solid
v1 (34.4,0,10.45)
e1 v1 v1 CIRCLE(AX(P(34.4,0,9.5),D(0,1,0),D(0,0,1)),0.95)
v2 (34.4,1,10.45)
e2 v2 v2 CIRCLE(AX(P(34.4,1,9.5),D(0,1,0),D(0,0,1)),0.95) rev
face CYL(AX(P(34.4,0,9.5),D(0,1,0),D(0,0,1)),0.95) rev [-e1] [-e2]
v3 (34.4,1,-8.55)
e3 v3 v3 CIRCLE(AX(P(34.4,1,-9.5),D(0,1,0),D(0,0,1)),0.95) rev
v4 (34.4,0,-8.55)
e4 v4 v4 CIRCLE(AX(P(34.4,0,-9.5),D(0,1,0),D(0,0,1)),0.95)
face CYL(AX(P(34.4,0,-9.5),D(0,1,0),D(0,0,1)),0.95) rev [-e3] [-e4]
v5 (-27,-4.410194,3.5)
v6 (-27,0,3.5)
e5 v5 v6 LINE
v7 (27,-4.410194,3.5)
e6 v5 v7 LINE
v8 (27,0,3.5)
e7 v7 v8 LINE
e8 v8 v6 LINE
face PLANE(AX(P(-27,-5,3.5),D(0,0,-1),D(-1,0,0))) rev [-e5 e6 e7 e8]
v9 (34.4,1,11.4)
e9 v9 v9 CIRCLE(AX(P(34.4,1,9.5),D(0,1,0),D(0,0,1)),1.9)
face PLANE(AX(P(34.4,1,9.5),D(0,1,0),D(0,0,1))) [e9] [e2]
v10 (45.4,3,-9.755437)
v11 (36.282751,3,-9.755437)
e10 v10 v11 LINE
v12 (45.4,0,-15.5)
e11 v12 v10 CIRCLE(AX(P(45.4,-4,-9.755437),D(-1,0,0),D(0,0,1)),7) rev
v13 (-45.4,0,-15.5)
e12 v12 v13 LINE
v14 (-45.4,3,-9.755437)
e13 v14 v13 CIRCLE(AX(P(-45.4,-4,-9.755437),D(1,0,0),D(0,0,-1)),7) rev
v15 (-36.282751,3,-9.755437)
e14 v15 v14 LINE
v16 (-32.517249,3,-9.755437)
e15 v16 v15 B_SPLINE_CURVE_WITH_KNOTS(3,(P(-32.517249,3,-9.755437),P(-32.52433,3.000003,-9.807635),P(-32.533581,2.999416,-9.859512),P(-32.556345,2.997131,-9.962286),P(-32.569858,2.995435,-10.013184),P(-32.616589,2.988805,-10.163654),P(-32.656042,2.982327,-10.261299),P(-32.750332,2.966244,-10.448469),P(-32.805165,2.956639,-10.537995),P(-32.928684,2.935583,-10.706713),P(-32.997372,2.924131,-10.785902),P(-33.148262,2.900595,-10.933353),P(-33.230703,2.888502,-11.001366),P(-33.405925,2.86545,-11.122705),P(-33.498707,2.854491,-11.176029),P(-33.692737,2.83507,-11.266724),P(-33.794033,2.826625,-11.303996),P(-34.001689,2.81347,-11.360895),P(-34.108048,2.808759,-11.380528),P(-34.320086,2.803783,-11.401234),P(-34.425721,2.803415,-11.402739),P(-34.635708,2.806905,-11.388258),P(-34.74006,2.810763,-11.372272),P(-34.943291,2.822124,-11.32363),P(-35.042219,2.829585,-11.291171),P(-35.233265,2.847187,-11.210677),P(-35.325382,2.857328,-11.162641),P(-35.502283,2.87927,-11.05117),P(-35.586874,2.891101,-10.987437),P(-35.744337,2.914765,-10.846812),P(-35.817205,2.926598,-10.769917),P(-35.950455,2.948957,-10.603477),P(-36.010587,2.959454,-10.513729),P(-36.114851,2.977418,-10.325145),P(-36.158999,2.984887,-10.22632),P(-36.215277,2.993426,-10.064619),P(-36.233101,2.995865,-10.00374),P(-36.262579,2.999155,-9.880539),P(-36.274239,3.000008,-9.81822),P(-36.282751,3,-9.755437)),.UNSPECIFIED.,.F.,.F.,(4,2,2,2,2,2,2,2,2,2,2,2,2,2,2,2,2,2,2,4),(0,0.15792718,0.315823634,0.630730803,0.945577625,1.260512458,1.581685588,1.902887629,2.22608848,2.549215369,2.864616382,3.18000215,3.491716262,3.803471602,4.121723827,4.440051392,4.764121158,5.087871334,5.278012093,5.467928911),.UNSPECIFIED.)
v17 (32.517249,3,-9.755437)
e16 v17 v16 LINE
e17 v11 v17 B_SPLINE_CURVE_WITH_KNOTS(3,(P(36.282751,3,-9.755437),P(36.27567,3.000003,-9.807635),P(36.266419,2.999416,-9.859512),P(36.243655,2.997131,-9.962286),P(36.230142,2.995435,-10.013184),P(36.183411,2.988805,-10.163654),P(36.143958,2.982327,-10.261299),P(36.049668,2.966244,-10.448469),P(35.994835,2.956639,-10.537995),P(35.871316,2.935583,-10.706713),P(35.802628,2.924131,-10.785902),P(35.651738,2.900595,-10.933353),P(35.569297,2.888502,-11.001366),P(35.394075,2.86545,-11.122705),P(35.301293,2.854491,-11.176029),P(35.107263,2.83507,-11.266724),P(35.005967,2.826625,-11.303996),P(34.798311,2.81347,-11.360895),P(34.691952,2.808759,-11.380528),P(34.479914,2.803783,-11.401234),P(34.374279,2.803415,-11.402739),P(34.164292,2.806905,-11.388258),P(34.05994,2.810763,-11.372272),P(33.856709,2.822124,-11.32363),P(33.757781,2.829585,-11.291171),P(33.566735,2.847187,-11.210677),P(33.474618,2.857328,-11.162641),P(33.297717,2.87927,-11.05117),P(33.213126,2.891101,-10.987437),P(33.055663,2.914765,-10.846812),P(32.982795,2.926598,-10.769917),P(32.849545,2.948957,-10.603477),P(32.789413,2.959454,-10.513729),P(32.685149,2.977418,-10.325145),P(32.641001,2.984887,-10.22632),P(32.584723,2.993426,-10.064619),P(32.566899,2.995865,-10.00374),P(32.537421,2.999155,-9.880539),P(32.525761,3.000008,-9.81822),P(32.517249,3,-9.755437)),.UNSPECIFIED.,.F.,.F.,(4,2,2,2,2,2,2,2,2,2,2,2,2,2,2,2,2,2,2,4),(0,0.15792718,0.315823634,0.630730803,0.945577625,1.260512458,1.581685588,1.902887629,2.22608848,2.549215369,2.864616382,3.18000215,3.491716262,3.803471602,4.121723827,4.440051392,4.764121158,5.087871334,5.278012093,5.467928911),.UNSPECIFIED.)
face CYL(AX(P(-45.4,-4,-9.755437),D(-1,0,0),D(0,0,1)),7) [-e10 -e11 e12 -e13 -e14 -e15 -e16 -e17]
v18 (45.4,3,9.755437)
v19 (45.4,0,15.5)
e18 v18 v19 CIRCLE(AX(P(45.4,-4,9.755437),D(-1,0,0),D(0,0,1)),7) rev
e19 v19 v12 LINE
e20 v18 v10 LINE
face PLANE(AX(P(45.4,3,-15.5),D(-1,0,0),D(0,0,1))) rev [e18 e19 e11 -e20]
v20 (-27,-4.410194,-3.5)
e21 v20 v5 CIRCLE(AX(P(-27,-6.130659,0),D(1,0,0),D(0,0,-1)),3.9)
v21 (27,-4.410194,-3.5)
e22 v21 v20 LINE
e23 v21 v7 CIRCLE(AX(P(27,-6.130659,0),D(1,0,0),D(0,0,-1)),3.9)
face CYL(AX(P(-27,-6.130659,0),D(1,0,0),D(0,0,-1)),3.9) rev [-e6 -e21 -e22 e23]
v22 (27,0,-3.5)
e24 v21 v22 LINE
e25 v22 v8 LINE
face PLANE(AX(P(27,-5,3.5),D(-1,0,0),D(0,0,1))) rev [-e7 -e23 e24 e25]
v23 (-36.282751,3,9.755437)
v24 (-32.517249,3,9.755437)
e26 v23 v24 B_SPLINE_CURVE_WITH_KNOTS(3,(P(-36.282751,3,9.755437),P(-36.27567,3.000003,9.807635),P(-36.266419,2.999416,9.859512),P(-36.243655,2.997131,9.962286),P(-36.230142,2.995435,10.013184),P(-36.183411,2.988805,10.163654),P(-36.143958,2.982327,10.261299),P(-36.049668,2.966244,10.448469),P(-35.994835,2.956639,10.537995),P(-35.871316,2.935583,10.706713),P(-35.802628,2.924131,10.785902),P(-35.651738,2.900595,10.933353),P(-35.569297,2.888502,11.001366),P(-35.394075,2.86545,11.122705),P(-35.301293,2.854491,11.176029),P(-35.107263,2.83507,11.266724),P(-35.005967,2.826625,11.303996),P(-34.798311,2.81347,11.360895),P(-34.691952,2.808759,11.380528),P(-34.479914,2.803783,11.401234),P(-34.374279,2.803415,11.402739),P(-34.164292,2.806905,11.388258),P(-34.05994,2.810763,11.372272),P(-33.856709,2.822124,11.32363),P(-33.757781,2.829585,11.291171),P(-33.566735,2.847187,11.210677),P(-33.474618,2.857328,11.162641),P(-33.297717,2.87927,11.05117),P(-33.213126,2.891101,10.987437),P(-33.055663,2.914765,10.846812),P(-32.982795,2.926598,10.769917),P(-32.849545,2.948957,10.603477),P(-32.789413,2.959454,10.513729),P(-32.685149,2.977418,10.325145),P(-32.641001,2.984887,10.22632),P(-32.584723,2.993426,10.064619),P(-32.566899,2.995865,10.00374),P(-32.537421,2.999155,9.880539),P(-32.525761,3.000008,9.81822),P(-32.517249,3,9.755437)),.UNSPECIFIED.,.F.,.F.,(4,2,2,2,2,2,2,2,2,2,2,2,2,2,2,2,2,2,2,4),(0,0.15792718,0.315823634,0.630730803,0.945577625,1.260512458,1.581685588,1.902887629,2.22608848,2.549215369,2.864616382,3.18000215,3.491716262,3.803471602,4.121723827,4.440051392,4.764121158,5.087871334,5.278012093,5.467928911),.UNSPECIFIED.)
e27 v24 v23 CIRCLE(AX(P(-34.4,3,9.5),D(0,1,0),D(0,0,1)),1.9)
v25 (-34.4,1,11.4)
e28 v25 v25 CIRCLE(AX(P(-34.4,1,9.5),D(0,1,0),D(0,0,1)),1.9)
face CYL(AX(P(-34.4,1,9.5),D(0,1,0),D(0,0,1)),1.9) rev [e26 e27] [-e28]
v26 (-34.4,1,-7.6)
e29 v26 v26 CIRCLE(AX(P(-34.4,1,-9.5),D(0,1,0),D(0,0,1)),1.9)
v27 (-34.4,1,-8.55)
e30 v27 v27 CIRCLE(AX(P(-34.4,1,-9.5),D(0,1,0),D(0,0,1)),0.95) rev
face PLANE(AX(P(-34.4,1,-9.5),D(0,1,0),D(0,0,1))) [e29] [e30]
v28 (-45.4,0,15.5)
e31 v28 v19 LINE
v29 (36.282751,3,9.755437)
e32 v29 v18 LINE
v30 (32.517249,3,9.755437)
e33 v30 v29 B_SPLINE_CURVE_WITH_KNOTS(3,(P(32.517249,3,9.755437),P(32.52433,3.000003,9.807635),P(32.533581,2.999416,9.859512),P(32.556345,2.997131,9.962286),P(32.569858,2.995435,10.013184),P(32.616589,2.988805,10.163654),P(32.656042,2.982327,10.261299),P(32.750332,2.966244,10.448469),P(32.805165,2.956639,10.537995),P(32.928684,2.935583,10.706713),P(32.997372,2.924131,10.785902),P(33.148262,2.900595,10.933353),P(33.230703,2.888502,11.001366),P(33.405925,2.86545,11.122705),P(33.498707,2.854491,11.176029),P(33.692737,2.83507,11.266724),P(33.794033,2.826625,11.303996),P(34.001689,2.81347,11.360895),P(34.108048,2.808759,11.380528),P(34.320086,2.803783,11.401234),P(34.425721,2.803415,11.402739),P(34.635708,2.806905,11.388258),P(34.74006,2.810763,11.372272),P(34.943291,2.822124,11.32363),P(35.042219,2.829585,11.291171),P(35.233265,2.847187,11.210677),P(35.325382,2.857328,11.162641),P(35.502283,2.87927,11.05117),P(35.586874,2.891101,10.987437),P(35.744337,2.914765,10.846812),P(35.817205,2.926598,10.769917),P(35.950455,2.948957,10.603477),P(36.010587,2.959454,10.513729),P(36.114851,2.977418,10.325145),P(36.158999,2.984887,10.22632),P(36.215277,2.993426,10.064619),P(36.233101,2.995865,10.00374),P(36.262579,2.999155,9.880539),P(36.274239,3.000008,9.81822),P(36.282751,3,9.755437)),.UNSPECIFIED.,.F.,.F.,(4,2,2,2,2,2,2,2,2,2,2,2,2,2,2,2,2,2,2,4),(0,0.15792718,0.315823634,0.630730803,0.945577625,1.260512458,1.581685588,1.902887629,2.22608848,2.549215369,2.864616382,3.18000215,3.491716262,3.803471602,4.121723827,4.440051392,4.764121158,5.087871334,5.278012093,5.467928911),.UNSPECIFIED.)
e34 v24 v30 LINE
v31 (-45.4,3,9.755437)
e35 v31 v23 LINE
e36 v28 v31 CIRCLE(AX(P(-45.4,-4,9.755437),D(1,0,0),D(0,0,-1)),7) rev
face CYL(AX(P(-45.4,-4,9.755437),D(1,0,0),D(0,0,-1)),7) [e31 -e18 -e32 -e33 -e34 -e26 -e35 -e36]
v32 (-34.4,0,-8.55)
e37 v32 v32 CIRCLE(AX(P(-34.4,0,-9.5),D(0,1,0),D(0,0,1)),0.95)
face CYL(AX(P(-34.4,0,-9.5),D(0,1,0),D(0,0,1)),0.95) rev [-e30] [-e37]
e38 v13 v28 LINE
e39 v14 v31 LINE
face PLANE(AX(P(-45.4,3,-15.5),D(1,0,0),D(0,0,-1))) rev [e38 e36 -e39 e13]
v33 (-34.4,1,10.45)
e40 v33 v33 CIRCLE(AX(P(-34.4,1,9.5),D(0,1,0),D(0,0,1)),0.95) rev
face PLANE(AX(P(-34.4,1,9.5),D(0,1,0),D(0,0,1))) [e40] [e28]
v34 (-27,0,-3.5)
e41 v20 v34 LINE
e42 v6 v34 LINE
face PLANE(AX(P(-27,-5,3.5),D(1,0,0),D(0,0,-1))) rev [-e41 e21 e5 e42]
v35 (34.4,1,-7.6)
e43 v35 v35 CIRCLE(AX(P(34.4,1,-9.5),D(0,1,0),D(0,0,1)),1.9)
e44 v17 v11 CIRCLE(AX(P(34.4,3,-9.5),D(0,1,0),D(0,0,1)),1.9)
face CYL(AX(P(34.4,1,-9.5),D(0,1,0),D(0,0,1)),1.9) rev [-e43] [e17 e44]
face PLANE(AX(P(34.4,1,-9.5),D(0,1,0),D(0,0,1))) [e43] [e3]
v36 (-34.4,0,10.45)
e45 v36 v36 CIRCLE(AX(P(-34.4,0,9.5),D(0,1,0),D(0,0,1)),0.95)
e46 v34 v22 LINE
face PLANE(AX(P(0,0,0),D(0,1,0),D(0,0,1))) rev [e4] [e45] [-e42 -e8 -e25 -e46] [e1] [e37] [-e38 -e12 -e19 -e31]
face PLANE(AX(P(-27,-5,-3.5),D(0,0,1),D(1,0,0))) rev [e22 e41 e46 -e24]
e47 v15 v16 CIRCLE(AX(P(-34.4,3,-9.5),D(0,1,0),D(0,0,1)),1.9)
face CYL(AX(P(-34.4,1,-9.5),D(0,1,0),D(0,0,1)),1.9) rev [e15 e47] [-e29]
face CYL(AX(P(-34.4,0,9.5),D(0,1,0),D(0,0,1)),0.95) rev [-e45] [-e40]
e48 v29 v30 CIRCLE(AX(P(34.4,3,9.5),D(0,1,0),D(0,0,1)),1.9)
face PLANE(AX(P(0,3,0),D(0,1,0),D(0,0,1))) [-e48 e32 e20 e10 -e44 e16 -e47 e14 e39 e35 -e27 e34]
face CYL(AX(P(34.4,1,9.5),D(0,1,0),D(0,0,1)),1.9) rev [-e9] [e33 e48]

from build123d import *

# Parameters (mm, degrees)
SKETCH1_W           = 90.8
SKETCH1_H           = 31
BOSS_EXTRUDE1_DEPTH = 3
SKETCH2_R           = 0.95
CUT_EXTRUDE1_DEPTH  = 3
SKETCH3_R           = 1.9
CUT_EXTRUDE2_DEPTH  = 2
SKETCH4_W           = 54
SKETCH4_H           = 7
BOSS_EXTRUDE2_DEPTH = 5
SKETCH5_R           = 3.9
CUT_EXTRUDE3_DEPTH  = 54
FILLET1_R           = 7


with BuildPart() as part:
    # Sketch1 → Boss-Extrude1 (new body)
    with BuildSketch(Plane(origin=(0, 0, 0), x_dir=(1, 0, 0), z_dir=(0, 1, 0))):
        Rectangle(SKETCH1_W, SKETCH1_H)
    extrude(amount=BOSS_EXTRUDE1_DEPTH)

    # Sketch2 → Cut-Extrude1 (cut)
    with BuildSketch(Plane(origin=(0, 3, 0), x_dir=(1, 0, 0), z_dir=(0, 1, 0))):
        with Locations(Location((-34.4, 9.5, 0), (0, 0, 270))):
            Circle(SKETCH2_R)
        with Locations(Location((34.4, 9.5, 0), (0, 0, 270))):
            Circle(SKETCH2_R)
        with Locations(Location((-34.4, -9.5, 0), (0, 0, 270))):
            Circle(SKETCH2_R)
        with Locations(Location((34.4, -9.5, 0), (0, 0, 270))):
            Circle(SKETCH2_R)
    extrude(amount=-CUT_EXTRUDE1_DEPTH, mode=Mode.SUBTRACT)

    # Sketch3 → Cut-Extrude2 (cut)
    with BuildSketch(Plane(origin=(0, 3, 0), x_dir=(1, 0, 0), z_dir=(0, 1, 0))):
        with Locations(Location((-34.4, 9.5, 0), (0, 0, 270))):
            Circle(SKETCH3_R)
        with Locations(Location((-34.4, -9.5, 0), (0, 0, 270))):
            Circle(SKETCH3_R)
        with Locations(Location((34.4, 9.5, 0), (0, 0, 270))):
            Circle(SKETCH3_R)
        with Locations(Location((34.4, -9.5, 0), (0, 0, 270))):
            Circle(SKETCH3_R)
    extrude(amount=-CUT_EXTRUDE2_DEPTH, mode=Mode.SUBTRACT)

    # Sketch4 → Boss-Extrude2 (add)
    with BuildSketch(Plane.XZ):
        Rectangle(SKETCH4_W, SKETCH4_H)
    extrude(amount=BOSS_EXTRUDE2_DEPTH)

    # Sketch5 → Cut-Extrude3 (cut)
    with BuildSketch(Plane(origin=(27, 0, 0), x_dir=(0, 0, -1), z_dir=(1, 0, 0))):
        with Locations((0, -6.130658567)):
            Circle(SKETCH5_R)
    extrude(amount=-CUT_EXTRUDE3_DEPTH, mode=Mode.SUBTRACT)

    # Fillet1
    # the kernel refuses this fillet: 7 mm, written as the material it takes off along each edge
    with BuildSketch(Plane(origin=(59.761406616, 3, 15.5), x_dir=(0, 0, -1), z_dir=(-1, 0, 0))) as fillet1_piece_1:
        with BuildLine():
            CenterArc((5.744562647, 7), FILLET1_R, 214.849904579, 55.150095421)
            Line((0, 3), (-0.114891253, 2.92))
            ThreePointArc((-0.114891253, 2.92), (-0.14, 1.5), (-0.14, 0))
            Line((-0.14, 0), (0, -0.14))
            Line((0, -0.14), (5.744562647, -0.14))
            Line((5.744562647, -0.14), (5.744562647, 0))
        make_face()
    extrude(amount=119.522813233, mode=Mode.SUBTRACT)
    with BuildSketch(Plane(origin=(-59.761406616, 3, -15.5), x_dir=(0, -1, 0), z_dir=(1, 0, 0))) as fillet1_piece_2:
        with BuildLine():
            CenterArc((7, -5.744562647), FILLET1_R, 124.849904579, 55.150095421)
            Line((0, -5.744562647), (-0.14, -5.744562647))
            Line((-0.14, -5.744562647), (-0.14, 0))
            Line((-0.14, 0), (0, 0.14))
            ThreePointArc((0, 0.14), (1.5, 0.14), (2.92, 0.114891253))
            Line((2.92, 0.114891253), (3, 0))
        make_face()
    extrude(amount=119.522813233, mode=Mode.SUBTRACT)


solid = part.part
